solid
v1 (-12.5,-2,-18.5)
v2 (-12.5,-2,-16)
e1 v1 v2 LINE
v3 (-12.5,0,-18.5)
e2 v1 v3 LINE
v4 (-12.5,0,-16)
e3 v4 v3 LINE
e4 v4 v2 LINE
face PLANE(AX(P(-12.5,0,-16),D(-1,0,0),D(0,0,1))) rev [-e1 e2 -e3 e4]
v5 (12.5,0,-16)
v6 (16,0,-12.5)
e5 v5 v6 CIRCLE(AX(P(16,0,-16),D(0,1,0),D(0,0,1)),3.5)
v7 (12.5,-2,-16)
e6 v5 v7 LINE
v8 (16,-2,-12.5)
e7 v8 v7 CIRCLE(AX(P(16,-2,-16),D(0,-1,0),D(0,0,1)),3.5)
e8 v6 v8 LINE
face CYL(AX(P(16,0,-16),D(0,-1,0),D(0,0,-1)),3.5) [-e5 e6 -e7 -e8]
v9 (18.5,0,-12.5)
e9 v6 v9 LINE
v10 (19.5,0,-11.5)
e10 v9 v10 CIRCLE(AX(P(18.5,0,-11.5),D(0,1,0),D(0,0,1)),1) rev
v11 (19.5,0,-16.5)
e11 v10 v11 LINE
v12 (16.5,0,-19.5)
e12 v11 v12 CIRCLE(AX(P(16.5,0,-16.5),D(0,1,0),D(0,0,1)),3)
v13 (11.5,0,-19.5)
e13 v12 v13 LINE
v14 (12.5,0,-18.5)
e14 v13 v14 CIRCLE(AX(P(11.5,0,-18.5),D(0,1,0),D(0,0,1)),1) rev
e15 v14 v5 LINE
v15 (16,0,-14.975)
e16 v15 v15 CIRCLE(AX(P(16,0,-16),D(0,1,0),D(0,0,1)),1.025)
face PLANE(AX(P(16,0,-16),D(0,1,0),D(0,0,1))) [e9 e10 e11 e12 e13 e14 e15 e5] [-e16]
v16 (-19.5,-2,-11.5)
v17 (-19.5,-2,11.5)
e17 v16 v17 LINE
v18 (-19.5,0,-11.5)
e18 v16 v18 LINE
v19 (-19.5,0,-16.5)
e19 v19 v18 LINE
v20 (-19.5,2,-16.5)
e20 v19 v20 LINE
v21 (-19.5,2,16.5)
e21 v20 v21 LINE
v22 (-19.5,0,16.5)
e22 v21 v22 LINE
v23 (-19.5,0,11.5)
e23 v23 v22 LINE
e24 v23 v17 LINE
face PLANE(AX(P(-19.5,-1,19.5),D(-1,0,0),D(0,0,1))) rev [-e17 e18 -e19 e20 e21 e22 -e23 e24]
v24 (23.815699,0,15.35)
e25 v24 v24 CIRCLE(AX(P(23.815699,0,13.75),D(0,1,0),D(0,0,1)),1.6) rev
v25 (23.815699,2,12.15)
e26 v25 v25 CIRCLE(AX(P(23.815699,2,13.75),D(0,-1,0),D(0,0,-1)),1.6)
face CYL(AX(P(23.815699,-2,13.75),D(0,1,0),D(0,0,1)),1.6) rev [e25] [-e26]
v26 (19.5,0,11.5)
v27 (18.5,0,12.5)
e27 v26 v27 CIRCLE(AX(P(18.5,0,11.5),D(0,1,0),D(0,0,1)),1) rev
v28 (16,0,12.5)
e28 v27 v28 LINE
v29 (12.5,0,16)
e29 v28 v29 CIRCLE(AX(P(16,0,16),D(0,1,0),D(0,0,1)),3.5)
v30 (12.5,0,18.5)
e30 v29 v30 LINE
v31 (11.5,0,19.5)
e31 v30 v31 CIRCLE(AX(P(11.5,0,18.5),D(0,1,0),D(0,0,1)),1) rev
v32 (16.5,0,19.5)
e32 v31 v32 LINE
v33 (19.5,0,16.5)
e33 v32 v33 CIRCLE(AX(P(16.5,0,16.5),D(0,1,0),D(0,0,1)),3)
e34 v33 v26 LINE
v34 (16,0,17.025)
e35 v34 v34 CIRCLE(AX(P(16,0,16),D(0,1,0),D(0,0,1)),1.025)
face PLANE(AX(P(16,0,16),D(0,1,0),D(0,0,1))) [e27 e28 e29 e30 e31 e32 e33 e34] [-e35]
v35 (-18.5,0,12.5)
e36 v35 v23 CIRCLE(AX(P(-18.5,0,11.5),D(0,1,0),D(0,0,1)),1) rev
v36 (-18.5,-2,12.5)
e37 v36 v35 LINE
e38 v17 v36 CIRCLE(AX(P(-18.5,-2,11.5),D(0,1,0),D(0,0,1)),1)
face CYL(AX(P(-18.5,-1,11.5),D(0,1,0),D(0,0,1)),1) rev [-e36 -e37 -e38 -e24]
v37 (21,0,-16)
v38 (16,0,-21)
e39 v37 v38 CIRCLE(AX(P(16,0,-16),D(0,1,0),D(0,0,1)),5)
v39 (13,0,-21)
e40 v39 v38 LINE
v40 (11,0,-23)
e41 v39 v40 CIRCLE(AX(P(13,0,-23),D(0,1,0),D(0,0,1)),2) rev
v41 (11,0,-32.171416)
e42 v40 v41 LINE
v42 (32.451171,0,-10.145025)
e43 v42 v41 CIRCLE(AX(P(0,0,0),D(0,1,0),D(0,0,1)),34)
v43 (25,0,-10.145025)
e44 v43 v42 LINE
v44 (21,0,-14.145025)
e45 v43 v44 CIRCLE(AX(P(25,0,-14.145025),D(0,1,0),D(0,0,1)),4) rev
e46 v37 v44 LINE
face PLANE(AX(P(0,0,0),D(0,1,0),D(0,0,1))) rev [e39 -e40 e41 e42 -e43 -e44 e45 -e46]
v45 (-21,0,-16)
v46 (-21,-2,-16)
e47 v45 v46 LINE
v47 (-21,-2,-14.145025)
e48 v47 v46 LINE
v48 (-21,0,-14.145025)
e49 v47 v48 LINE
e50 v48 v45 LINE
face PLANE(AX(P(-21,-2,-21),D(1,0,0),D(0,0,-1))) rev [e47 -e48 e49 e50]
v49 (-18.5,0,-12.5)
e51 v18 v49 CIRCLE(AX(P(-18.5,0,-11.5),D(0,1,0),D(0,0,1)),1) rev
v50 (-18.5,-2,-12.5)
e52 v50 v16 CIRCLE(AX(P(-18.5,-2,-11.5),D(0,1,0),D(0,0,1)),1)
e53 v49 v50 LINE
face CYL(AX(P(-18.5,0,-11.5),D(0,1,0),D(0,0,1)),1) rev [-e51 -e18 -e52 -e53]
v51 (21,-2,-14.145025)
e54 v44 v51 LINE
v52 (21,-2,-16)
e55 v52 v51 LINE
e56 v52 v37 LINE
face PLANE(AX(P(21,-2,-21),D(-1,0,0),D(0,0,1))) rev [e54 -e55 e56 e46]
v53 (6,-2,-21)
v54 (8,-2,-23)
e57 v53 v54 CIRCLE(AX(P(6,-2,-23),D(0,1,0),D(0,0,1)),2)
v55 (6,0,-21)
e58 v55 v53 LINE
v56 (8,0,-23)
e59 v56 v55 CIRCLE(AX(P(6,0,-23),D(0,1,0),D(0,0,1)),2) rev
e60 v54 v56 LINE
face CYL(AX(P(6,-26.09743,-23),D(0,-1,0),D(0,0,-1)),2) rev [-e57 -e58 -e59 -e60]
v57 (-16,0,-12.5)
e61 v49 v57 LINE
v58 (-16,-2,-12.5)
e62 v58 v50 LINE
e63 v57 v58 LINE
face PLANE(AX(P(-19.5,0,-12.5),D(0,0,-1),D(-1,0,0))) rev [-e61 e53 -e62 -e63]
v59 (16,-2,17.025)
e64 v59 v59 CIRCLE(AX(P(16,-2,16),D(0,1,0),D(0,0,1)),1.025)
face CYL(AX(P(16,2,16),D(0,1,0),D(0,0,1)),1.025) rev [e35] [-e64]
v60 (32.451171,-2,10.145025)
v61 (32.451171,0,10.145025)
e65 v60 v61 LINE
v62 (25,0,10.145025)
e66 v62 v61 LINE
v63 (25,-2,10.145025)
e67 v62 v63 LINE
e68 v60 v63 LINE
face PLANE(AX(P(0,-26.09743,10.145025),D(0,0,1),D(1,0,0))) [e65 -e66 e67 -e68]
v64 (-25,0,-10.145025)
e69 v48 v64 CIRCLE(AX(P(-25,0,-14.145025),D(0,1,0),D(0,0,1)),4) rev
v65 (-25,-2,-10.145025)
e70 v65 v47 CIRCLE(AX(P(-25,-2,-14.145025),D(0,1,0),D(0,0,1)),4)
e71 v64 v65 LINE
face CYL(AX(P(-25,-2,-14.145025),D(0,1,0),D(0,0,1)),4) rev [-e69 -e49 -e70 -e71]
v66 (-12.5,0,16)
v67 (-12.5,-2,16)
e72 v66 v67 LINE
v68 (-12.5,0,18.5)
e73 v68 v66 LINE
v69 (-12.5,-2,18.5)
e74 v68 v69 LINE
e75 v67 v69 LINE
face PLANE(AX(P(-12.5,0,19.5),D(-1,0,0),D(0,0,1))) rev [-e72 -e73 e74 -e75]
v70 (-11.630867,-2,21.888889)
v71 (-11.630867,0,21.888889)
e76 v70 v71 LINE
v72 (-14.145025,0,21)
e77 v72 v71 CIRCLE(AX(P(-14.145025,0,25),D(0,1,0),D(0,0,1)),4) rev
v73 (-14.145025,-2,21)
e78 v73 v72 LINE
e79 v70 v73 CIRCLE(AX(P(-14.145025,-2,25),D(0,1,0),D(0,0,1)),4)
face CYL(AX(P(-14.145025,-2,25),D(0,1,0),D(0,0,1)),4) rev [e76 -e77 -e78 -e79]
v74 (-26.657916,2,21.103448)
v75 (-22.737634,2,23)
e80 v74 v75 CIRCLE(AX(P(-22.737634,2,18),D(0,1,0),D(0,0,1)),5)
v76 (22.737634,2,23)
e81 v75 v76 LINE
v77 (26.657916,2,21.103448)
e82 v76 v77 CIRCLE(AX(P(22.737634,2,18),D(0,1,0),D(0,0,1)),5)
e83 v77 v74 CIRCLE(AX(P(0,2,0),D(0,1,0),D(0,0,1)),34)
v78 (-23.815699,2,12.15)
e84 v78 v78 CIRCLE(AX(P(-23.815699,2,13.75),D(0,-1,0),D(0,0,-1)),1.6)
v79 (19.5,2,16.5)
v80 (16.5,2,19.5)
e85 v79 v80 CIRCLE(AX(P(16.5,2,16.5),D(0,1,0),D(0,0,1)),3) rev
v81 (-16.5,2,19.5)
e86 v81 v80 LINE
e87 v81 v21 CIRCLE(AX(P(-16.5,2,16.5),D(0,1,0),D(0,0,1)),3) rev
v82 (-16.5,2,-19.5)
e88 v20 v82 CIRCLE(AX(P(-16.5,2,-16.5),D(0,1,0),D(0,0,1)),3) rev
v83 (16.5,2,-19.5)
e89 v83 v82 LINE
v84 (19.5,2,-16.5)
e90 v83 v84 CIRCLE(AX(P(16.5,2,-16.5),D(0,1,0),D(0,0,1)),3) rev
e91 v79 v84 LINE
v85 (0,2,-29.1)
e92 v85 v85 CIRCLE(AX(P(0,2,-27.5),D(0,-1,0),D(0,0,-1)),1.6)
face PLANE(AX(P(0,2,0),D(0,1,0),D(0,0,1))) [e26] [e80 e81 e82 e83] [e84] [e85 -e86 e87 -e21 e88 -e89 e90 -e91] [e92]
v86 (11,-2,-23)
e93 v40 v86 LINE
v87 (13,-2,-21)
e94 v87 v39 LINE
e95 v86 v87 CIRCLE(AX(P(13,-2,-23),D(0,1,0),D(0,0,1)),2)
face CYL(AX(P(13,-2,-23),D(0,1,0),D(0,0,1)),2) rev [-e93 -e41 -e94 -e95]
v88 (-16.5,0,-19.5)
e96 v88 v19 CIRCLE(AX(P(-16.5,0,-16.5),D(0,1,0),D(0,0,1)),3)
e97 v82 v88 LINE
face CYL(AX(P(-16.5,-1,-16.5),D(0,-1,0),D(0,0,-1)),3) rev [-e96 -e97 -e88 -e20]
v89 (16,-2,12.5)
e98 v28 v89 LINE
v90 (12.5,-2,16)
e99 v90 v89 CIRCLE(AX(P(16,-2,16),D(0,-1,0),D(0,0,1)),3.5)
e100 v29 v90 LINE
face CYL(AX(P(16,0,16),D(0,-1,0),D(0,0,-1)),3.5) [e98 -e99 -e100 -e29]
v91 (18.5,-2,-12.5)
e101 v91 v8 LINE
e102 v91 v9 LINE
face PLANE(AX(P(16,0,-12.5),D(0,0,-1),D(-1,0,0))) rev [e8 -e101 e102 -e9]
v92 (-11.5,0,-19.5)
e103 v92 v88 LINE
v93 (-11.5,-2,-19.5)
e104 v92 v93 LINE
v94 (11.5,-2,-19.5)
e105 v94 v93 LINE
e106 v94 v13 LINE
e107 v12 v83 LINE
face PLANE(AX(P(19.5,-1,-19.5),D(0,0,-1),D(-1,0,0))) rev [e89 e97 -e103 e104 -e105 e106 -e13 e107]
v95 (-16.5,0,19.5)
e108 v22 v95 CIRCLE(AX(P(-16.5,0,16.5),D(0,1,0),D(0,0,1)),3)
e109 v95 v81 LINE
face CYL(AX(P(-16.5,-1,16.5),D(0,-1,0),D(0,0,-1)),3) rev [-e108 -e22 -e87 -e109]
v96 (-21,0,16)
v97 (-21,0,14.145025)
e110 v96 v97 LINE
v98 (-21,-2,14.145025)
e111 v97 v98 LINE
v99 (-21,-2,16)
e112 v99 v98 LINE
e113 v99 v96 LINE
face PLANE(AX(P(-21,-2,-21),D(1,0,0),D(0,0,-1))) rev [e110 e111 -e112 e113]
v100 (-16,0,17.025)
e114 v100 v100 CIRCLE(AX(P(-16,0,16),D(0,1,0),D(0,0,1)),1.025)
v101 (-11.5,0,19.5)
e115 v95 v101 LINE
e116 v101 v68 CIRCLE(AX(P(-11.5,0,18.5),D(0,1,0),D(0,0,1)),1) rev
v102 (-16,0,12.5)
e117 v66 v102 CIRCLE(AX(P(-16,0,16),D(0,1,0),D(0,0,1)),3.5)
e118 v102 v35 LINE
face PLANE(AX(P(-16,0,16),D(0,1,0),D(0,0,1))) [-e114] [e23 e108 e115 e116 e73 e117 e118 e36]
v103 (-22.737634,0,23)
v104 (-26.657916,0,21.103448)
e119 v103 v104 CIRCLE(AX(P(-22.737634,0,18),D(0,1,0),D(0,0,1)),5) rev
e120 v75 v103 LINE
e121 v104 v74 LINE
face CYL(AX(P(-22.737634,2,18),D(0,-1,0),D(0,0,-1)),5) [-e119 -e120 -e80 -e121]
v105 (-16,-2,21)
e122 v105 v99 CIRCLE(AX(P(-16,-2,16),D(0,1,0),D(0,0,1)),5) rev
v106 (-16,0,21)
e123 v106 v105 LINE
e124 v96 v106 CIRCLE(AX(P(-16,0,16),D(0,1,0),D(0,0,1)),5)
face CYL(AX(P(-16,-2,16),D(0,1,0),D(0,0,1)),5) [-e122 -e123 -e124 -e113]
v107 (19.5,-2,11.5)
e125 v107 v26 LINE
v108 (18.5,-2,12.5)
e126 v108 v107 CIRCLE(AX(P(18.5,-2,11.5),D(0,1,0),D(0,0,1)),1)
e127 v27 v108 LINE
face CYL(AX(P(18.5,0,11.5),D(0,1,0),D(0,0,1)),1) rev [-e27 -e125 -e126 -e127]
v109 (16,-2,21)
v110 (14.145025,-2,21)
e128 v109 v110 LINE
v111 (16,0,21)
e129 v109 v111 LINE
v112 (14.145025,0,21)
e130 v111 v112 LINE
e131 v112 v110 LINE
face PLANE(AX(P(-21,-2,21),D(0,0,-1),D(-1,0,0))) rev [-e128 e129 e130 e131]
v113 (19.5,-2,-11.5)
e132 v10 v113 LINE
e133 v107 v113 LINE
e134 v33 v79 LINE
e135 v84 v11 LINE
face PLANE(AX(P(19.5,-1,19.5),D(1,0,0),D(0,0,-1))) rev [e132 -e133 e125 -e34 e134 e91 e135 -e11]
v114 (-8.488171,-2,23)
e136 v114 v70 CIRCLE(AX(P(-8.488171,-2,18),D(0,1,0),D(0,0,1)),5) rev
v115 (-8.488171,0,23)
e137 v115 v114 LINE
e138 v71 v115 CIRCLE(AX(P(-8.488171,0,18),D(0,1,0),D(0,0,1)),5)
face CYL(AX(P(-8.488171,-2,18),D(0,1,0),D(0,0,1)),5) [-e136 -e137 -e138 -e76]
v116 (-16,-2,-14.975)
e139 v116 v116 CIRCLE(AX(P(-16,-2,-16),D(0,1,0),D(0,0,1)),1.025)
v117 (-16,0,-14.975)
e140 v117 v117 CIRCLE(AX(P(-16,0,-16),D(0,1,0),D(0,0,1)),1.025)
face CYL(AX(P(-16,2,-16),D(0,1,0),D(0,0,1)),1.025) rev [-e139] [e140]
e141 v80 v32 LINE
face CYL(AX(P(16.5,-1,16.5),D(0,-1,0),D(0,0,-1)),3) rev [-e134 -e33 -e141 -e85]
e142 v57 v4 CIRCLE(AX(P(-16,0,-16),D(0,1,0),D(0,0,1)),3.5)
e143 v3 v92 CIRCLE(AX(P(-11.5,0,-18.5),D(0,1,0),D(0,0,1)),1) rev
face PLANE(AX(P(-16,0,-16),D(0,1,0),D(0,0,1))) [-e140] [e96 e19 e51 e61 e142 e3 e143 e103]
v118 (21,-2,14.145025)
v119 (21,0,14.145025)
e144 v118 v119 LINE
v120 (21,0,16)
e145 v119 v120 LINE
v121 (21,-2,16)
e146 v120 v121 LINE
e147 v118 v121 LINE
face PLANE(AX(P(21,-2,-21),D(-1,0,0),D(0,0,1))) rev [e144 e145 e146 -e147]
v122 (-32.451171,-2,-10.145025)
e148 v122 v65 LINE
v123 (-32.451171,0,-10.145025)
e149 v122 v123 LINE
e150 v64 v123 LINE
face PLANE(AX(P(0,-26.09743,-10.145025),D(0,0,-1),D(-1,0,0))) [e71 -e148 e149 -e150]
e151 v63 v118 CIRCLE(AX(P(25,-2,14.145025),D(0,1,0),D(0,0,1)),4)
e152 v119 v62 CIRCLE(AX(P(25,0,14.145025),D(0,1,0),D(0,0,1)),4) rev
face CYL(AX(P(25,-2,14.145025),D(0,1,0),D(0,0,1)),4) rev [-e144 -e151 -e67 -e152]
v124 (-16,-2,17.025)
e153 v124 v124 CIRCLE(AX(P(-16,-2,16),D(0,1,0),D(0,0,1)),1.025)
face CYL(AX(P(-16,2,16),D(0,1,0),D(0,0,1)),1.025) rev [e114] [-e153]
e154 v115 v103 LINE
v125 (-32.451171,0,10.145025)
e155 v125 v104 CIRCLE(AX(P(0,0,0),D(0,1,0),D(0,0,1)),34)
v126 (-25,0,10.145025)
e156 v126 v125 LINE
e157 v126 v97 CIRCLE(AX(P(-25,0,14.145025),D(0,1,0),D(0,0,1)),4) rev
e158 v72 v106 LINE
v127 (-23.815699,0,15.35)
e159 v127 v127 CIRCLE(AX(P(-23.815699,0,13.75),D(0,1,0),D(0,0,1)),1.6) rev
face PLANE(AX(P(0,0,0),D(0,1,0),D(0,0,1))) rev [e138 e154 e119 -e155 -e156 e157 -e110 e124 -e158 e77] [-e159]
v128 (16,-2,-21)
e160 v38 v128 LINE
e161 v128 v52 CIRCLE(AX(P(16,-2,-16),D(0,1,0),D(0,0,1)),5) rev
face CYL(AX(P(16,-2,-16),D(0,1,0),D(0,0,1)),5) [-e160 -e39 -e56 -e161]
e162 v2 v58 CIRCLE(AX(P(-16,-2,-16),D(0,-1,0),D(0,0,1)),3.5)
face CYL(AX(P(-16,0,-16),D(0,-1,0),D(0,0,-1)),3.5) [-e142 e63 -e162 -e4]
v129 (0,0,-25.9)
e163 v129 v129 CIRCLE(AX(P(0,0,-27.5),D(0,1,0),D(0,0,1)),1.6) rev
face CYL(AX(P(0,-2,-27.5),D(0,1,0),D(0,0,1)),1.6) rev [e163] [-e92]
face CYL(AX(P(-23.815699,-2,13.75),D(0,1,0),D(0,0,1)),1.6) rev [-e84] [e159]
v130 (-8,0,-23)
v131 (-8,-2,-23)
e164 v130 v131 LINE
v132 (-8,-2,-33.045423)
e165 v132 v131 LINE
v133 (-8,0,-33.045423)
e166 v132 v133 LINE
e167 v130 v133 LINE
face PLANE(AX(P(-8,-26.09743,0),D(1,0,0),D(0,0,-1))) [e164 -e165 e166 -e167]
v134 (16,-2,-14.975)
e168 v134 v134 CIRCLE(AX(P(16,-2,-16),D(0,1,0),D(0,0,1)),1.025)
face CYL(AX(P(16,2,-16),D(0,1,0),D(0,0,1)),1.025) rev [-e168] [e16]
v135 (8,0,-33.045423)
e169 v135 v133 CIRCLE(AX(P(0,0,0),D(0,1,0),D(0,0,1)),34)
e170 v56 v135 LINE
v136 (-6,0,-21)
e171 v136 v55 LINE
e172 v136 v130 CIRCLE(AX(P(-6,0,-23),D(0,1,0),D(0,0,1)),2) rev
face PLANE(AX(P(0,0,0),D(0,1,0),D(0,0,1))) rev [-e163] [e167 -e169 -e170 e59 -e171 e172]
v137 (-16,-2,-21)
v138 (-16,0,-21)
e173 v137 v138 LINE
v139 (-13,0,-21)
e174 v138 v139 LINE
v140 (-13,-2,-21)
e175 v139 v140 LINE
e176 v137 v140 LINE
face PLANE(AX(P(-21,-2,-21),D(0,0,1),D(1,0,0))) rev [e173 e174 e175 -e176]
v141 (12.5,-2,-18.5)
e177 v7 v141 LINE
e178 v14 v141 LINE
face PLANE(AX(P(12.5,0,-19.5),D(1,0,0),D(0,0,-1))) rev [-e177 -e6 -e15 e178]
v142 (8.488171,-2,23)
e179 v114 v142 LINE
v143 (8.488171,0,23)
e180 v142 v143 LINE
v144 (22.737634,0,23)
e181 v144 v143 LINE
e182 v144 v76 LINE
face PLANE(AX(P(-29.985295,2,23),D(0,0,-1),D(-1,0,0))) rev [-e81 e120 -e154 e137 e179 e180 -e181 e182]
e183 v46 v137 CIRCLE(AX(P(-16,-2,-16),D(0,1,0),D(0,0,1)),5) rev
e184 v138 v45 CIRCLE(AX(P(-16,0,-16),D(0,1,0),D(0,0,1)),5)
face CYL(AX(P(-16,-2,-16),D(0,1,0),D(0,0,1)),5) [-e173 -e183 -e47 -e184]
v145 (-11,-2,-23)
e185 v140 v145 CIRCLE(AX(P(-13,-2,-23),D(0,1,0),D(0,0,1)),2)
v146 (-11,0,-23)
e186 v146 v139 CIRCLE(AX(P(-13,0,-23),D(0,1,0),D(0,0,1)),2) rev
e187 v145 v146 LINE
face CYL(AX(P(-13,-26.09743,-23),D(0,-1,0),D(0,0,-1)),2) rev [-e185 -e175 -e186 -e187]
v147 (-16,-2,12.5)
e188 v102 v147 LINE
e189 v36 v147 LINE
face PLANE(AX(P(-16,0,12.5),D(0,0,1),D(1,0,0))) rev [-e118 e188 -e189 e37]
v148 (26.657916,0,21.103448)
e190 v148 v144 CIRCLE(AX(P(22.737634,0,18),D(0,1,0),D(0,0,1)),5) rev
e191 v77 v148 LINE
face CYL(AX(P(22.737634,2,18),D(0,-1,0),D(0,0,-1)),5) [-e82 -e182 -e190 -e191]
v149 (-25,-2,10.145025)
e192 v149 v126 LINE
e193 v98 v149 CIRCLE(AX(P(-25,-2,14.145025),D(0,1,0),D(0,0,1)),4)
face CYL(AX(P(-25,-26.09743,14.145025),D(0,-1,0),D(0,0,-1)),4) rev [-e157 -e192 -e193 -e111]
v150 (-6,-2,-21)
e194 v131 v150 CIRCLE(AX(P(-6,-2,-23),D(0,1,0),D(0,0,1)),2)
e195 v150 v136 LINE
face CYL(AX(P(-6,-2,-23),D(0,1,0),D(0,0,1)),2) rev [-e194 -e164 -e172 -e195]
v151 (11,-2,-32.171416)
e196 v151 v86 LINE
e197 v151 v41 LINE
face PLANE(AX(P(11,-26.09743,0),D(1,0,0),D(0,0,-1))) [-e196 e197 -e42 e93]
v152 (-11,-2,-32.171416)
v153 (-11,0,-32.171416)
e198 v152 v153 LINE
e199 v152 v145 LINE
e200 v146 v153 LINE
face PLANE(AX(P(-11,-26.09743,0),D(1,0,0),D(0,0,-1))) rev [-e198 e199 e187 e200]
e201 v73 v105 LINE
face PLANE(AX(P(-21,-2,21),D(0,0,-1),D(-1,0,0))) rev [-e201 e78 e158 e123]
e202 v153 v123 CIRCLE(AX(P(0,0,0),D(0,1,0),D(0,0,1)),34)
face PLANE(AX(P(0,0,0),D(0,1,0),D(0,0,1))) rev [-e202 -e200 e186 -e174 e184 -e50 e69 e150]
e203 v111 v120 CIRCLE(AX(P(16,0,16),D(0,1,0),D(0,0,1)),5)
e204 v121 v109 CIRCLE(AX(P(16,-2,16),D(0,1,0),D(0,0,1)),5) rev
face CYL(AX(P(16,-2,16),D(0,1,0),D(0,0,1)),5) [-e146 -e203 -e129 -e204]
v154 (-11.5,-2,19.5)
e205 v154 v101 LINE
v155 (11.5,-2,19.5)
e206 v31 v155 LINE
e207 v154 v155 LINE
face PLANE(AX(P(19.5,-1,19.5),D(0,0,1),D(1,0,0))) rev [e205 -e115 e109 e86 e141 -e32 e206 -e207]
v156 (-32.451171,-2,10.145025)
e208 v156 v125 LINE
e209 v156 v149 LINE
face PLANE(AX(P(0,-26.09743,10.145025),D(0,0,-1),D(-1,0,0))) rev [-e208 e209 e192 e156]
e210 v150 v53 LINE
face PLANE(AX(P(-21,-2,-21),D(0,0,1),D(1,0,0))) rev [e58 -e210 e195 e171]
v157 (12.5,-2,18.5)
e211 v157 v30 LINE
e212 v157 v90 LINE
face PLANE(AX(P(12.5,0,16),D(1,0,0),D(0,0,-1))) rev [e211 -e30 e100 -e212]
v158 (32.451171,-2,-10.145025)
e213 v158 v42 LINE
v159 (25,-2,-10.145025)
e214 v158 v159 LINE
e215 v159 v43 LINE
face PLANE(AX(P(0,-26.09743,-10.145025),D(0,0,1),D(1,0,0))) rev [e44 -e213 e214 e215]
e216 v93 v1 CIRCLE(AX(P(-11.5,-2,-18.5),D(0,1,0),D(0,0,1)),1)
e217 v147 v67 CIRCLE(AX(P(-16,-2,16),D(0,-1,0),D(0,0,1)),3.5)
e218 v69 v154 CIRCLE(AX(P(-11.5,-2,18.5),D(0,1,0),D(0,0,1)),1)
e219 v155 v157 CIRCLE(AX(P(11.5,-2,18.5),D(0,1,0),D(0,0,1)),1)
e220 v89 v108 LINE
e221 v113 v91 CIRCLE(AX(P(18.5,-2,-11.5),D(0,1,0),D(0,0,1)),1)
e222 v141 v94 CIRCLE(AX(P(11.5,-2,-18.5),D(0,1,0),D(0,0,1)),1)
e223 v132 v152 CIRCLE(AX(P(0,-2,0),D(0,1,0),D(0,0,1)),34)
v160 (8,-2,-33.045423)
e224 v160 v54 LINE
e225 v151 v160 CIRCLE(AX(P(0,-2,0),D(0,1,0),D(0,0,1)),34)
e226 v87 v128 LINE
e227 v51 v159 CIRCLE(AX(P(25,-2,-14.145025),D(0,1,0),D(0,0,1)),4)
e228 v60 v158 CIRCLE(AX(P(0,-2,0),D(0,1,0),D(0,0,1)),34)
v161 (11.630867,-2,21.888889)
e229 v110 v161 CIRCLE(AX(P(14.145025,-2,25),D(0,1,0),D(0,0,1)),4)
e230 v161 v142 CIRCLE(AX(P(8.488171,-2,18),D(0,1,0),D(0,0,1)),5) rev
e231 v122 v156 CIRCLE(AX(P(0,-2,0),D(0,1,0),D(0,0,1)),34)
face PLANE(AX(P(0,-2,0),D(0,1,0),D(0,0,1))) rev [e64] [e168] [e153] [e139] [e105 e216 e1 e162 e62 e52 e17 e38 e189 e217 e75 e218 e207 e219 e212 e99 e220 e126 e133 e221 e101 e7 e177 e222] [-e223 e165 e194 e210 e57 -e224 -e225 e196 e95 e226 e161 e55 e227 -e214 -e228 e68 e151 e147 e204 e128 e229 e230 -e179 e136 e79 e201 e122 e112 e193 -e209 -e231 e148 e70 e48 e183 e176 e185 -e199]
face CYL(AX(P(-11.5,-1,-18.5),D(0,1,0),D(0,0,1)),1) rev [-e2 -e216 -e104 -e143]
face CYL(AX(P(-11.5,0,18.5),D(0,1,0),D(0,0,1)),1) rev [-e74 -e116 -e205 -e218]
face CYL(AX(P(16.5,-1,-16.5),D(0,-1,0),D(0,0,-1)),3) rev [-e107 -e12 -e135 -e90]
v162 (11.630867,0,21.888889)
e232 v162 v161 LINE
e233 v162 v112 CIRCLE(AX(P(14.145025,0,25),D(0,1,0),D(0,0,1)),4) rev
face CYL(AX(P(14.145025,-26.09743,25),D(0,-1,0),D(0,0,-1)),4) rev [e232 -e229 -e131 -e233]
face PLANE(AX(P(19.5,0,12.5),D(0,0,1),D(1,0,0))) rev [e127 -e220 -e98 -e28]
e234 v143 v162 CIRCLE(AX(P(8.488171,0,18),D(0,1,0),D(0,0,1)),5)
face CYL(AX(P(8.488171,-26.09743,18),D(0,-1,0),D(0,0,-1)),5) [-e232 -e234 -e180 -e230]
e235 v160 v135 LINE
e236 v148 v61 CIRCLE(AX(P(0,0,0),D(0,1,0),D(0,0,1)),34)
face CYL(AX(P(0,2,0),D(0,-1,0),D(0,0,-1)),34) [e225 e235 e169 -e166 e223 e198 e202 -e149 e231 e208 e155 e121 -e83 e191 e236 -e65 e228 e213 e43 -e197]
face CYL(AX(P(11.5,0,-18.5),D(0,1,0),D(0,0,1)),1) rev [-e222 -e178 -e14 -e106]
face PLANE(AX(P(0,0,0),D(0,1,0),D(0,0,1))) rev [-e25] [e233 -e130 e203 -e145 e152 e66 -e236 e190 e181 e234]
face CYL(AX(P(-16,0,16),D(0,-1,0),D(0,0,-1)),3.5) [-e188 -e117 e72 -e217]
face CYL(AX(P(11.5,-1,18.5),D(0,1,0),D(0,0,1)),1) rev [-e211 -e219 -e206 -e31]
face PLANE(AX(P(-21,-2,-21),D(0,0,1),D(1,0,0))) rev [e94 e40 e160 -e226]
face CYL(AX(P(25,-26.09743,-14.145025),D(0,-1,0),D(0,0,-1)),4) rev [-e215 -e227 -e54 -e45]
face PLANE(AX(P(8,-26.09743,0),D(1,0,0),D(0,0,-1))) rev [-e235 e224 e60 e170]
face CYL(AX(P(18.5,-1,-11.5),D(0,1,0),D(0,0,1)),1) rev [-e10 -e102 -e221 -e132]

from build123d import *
from build123d.topology import SkipClean

# Parameters (mm, degrees)
SKETCH1_R                         = 34
BOSS_EXTRUDE1_DEPTH               = 2
M2_CLEARANCE_HOLE1_D              = 2.4
SKETCH11_W                        = 42
SKETCH11_H                        = 42
BOSS_EXTRUDE3_DEPTH               = 2
TAP_START                         = -2
TAP_DRILL_FOR_M2_5_TAP1_OUTLINE_R = 1.025
TAP_DRILL_FOR_M2_5_TAP1_DEPTH     = 4
CUT_EXTRUDE1_DEPTH                = 49.124837662
CUT_EXTRUDE1_DEPTH_BACK           = 2
SKETCH10_R                        = 1.6
SKETCH12_W                        = 39
SKETCH12_H                        = 39
CUT_EXTRUDE2_DEPTH                = 3
SKETCH13_R                        = 1.025
BOSS_EXTRUDE4_DEPTH               = 1
FILLET1_R                         = 1
FILLET2_R                         = 5
CUT_EXTRUDE3_DEPTH                = 49.176757882
BOSS_EXTRUDE5_START               = 2
BOSS_EXTRUDE5_DEPTH               = 2
FILLET3_R                         = 4
FILLET4_R                         = 2
FILLET5_R                         = 3
CUT_EXTRUDE4_DEPTH                = 49.124837662
CUT_EXTRUDE4_DEPTH_BACK           = 49.124837662
SKETCH16_W                        = 58.171472577
SKETCH16_H                        = 11
FILLET6_R                         = 5


# Read off the part's stored shape, not the designer's step: Tap Drill for M2.5 Tap1
with BuildPart() as part:
    # Sketch1 → Boss-Extrude1 (new body)
    with BuildSketch(Plane(origin=(0, 0, 0), x_dir=(1, 0, 0), z_dir=(0, 1, 0))):
        with Locations(Location((0, 0, 0), (0, 0, 270))):
            Circle(SKETCH1_R)
    extrude(amount=BOSS_EXTRUDE1_DEPTH)

    # M2 Clearance Hole1 (through all)
    with Locations(Plane(origin=(0, 2, 0), x_dir=(1, 0, 0), z_dir=(0, 1, 0))):
        with Locations((-23.815698604, -13.75), (0, 27.5), (23.815698604, -13.75)):
            Hole(M2_CLEARANCE_HOLE1_D / 2)

    # Sketch11 → Boss-Extrude3 (add)
    with BuildSketch(Plane.XZ):
        Rectangle(SKETCH11_W, SKETCH11_H)
    extrude(amount=BOSS_EXTRUDE3_DEPTH)

    # Tap Drill for M2.5 Tap1 outline → Tap Drill for M2.5 Tap1 (cut)
    with BuildSketch(Plane(origin=(0, 0, 0), x_dir=(1, 0, 0), z_dir=(0, 1, 0)).offset(TAP_START)):
        with Locations((-16, 16)):
            Circle(TAP_DRILL_FOR_M2_5_TAP1_OUTLINE_R)
        with Locations((16, -16)):
            Circle(TAP_DRILL_FOR_M2_5_TAP1_OUTLINE_R)
        with Locations((16, 16)):
            Circle(TAP_DRILL_FOR_M2_5_TAP1_OUTLINE_R)
        with Locations((-16, -16)):
            Circle(TAP_DRILL_FOR_M2_5_TAP1_OUTLINE_R)
    extrude(amount=TAP_DRILL_FOR_M2_5_TAP1_DEPTH, mode=Mode.SUBTRACT)

    # Sketch10 → Cut-Extrude1 (cut, two sides: drawn at the far end of the back side and taken through both)
    with BuildSketch(Plane.XZ.offset(-CUT_EXTRUDE1_DEPTH_BACK)):
        with Locations(Location((0, -27.5, 0), (0, 0, 90))):
            Circle(SKETCH10_R)
        with Locations(Location((-23.815698604, 13.75, 0), (0, 0, 90))):
            Circle(SKETCH10_R)
        with Locations(Location((23.815698604, 13.75, 0), (0, 0, 90))):
            Circle(SKETCH10_R)
    extrude(amount=CUT_EXTRUDE1_DEPTH + CUT_EXTRUDE1_DEPTH_BACK, mode=Mode.SUBTRACT)

    # Sketch12 → Cut-Extrude2 (cut)
    with BuildSketch(Plane(origin=(0, 2, 0), x_dir=(1, 0, 0), z_dir=(0, 1, 0))):
        Rectangle(SKETCH12_W, SKETCH12_H)
    extrude(amount=-CUT_EXTRUDE2_DEPTH, mode=Mode.SUBTRACT)

    # Sketch13 → Boss-Extrude4 (add)
    # profile 1 of 4: a face of its own
    with BuildSketch(Plane(origin=(0, -1, 0), x_dir=(1, 0, 0), z_dir=(0, 1, 0))):
        with BuildLine():
            Line((-12.5, 16), (-12.5, 19.5))
            Line((-12.5, 19.5), (-19.5, 19.5))
            Line((-19.5, 19.5), (-19.5, 12.5))
            Line((-19.5, 12.5), (-16, 12.5))
            ThreePointArc((-16, 12.5), (-13.525126266, 13.525126266), (-12.5, 16))
        make_face()
        with Locations(Location((-16, 16, 0), (0, 0, 270))):
            Circle(SKETCH13_R, mode=Mode.SUBTRACT)
    # profile 2 of 4: a face of its own
    with BuildSketch(Plane(origin=(0, -1, 0), x_dir=(1, 0, 0), z_dir=(0, 1, 0))):
        with BuildLine():
            Line((16, 12.5), (19.5, 12.5))
            Line((19.5, 12.5), (19.5, 19.5))
            Line((19.5, 19.5), (12.5, 19.5))
            Line((12.5, 19.5), (12.5, 16))
            ThreePointArc((12.5, 16), (13.525126266, 13.525126266), (16, 12.5))
        make_face()
        with Locations(Location((16, 16, 0), (0, 0, 270))):
            Circle(SKETCH13_R, mode=Mode.SUBTRACT)
    # profile 3 of 4: a face of its own
    with BuildSketch(Plane(origin=(0, -1, 0), x_dir=(1, 0, 0), z_dir=(0, 1, 0))):
        with BuildLine():
            Line((12.5, -16), (12.5, -19.5))
            Line((12.5, -19.5), (19.5, -19.5))
            Line((19.5, -19.5), (19.5, -12.5))
            Line((19.5, -12.5), (16, -12.5))
            ThreePointArc((16, -12.5), (13.525126266, -13.525126266), (12.5, -16))
        make_face()
        with Locations(Location((16, -16, 0), (0, 0, 270))):
            Circle(SKETCH13_R, mode=Mode.SUBTRACT)
    # profile 4 of 4: a face of its own
    with BuildSketch(Plane(origin=(0, -1, 0), x_dir=(1, 0, 0), z_dir=(0, 1, 0))):
        with BuildLine():
            Line((-16, -12.5), (-19.5, -12.5))
            Line((-19.5, -12.5), (-19.5, -19.5))
            Line((-19.5, -19.5), (-12.5, -19.5))
            Line((-12.5, -19.5), (-12.5, -16))
            ThreePointArc((-12.5, -16), (-13.525126266, -13.525126266), (-16, -12.5))
        make_face()
        with Locations(Location((-16, -16, 0), (0, 0, 270))):
            Circle(SKETCH13_R, mode=Mode.SUBTRACT)
    extrude(amount=BOSS_EXTRUDE4_DEPTH)

    # Fillet1
    fillet1_edges = [part.edges().sort_by_distance(p)[0] for p in [
        (-12.5, -0.5, -19.5),
        (-19.5, -0.5, -12.5),
        (19.5, -0.5, -12.5),
        (12.5, -0.5, -19.5),
        (12.5, -0.5, 19.5),
        (19.5, -0.5, 12.5),
        (-19.5, -0.5, 12.5),
        (-12.5, -0.5, 19.5),
    ]]
    fillet(fillet1_edges, radius=FILLET1_R)

    # Fillet2
    fillet2_edges = [part.edges().sort_by_distance(p)[0] for p in [
        (21, -1, -21),
        (21, -1, 21),
        (-21, -1, 21),
        (-21, -1, -21),
    ]]
    fillet(fillet2_edges, radius=FILLET2_R)

    # Sketch14 → Cut-Extrude3 (cut, through all)
    with BuildSketch(Plane(origin=(0, -1, 0), x_dir=(1, 0, 0), z_dir=(0, 1, 0))):
        with BuildLine():
            Line((12.5, 16), (12.5, 18.5))
            ThreePointArc((12.5, 18.5), (12.207106781, 19.207106781), (11.5, 19.5))
            Line((11.5, 19.5), (-11.5, 19.5))
            ThreePointArc((-11.5, 19.5), (-12.207106781, 19.207106781), (-12.5, 18.5))
            Line((-12.5, 18.5), (-12.5, 16))
            ThreePointArc((-12.5, 16), (-13.525126266, 13.525126266), (-16, 12.5))
            Line((-16, 12.5), (-18.5, 12.5))
            ThreePointArc((-18.5, 12.5), (-19.207106781, 12.207106781), (-19.5, 11.5))
            Line((-19.5, 11.5), (-19.5, -11.5))
            ThreePointArc((-19.5, -11.5), (-19.207106781, -12.207106781), (-18.5, -12.5))
            Line((-18.5, -12.5), (-16, -12.5))
            ThreePointArc((-16, -12.5), (-13.525126266, -13.525126266), (-12.5, -16))
            Line((-12.5, -16), (-12.5, -18.5))
            ThreePointArc((-12.5, -18.5), (-12.207106781, -19.207106781), (-11.5, -19.5))
            Line((-11.5, -19.5), (11.5, -19.5))
            ThreePointArc((11.5, -19.5), (12.207106781, -19.207106781), (12.5, -18.5))
            Line((12.5, -18.5), (12.5, -16))
            ThreePointArc((12.5, -16), (13.525126266, -13.525126266), (16, -12.5))
            Line((16, -12.5), (18.5, -12.5))
            ThreePointArc((18.5, -12.5), (19.207106781, -12.207106781), (19.5, -11.5))
            Line((19.5, -11.5), (19.5, 11.5))
            ThreePointArc((19.5, 11.5), (19.207106781, 12.207106781), (18.5, 12.5))
            Line((18.5, 12.5), (16, 12.5))
            ThreePointArc((16, 12.5), (13.525126266, 13.525126266), (12.5, 16))
        make_face()
    extrude(amount=-CUT_EXTRUDE3_DEPTH, mode=Mode.SUBTRACT)

    # Sketch15 → Boss-Extrude5 (add)
    with SkipClean():  # the faces are left unmerged after this step: merging them gives an invalid solid
        with BuildSketch(Plane.XZ.offset(BOSS_EXTRUDE5_START)):
            with BuildLine():
                Line((-10.145024857, 32.451170559), (-10.145024857, 21))
                Line((-10.145024857, 21), (10.145024857, 21))
                Line((10.145024857, 21), (10.145024857, 32.451170559))
                ThreePointArc((10.145024857, 32.451170559), (0, 34), (-10.145024857, 32.451170559))
            make_face()
            with BuildLine():
                Line((-21, 10.145024857), (-32.451170559, 10.145024857))
                ThreePointArc((-32.451170559, 10.145024857), (-34, 0), (-32.451170559, -10.145024857))
                Line((-32.451170559, -10.145024857), (-21, -10.145024857))
                Line((-21, -10.145024857), (-21, 10.145024857))
            make_face()
            with BuildLine():
                Line((-11, -21), (-11, -32.171415884))
                ThreePointArc((-11, -32.171415884), (-9.510045859, -32.642901644), (-8, -33.045423284))
                Line((-8, -33.045423284), (-8, -21))
                Line((-8, -21), (-11, -21))
            make_face()
            with BuildLine():
                ThreePointArc((8, -33.045423284), (9.510045859, -32.642901644), (11, -32.171415884))
                Line((11, -32.171415884), (11, -21))
                Line((11, -21), (8, -21))
                Line((8, -21), (8, -33.045423284))
            make_face()
            with BuildLine():
                ThreePointArc((34, 0), (33.610562321, 5.131286437), (32.451170559, 10.145024857))
                Line((32.451170559, 10.145024857), (21, 10.145024857))
                Line((21, 10.145024857), (21, -10.145024857))
                Line((21, -10.145024857), (32.451170559, -10.145024857))
                ThreePointArc((32.451170559, -10.145024857), (33.610562321, -5.131286437), (34, 0))
            make_face()
        extrude(amount=-BOSS_EXTRUDE5_DEPTH)

    # Fillet3
    fillet3_edges = [part.edges().sort_by_distance(p)[0] for p in [
        (-10.145024857, -1, 21),
        (10.145024857, -1, 21),
        (-21, -1, -10.145024857),
        (-21, -1, 10.145024857),
        (21, -1, 10.145024857),
        (21, -1, -10.145024857),
    ]]
    fillet(fillet3_edges, radius=FILLET3_R)

    # Fillet4
    fillet4_edges = [part.edges().sort_by_distance(p)[0] for p in [
        (-8, -1, -21),
        (-11, -1, -21),
        (11, -1, -21),
        (8, -1, -21),
    ]]
    fillet(fillet4_edges, radius=FILLET4_R)

    # Fillet5
    fillet5_edges = [part.edges().sort_by_distance(p)[0] for p in [
        (-19.5, 1, -19.5),
        (19.5, 1, -19.5),
        (19.5, 1, 19.5),
        (-19.5, 1, 19.5),
    ]]
    fillet(fillet5_edges, radius=FILLET5_R)

    # Sketch16 → Cut-Extrude4 (cut, two sides: drawn at the far end of the back side and taken through both)
    with SkipClean():  # the faces are left unmerged after this step: merging them gives an invalid solid
        with BuildSketch(Plane.XZ.offset(-CUT_EXTRUDE4_DEPTH_BACK)):
            with Locations((-0.899558855, 28.5)):
                Rectangle(SKETCH16_W, SKETCH16_H)
        extrude(amount=CUT_EXTRUDE4_DEPTH + CUT_EXTRUDE4_DEPTH_BACK, mode=Mode.SUBTRACT)

    # Fillet6
    fillet6_edges = [part.edges().sort_by_distance(p)[0] for p in [
        (10.680923241, -1, 23),
        (-25.039968051, 1, 23),
        (25.039968051, 1, 23),
        (-10.680923241, -1, 23),
    ]]
    fillet(fillet6_edges, radius=FILLET6_R)


solid = part.part
